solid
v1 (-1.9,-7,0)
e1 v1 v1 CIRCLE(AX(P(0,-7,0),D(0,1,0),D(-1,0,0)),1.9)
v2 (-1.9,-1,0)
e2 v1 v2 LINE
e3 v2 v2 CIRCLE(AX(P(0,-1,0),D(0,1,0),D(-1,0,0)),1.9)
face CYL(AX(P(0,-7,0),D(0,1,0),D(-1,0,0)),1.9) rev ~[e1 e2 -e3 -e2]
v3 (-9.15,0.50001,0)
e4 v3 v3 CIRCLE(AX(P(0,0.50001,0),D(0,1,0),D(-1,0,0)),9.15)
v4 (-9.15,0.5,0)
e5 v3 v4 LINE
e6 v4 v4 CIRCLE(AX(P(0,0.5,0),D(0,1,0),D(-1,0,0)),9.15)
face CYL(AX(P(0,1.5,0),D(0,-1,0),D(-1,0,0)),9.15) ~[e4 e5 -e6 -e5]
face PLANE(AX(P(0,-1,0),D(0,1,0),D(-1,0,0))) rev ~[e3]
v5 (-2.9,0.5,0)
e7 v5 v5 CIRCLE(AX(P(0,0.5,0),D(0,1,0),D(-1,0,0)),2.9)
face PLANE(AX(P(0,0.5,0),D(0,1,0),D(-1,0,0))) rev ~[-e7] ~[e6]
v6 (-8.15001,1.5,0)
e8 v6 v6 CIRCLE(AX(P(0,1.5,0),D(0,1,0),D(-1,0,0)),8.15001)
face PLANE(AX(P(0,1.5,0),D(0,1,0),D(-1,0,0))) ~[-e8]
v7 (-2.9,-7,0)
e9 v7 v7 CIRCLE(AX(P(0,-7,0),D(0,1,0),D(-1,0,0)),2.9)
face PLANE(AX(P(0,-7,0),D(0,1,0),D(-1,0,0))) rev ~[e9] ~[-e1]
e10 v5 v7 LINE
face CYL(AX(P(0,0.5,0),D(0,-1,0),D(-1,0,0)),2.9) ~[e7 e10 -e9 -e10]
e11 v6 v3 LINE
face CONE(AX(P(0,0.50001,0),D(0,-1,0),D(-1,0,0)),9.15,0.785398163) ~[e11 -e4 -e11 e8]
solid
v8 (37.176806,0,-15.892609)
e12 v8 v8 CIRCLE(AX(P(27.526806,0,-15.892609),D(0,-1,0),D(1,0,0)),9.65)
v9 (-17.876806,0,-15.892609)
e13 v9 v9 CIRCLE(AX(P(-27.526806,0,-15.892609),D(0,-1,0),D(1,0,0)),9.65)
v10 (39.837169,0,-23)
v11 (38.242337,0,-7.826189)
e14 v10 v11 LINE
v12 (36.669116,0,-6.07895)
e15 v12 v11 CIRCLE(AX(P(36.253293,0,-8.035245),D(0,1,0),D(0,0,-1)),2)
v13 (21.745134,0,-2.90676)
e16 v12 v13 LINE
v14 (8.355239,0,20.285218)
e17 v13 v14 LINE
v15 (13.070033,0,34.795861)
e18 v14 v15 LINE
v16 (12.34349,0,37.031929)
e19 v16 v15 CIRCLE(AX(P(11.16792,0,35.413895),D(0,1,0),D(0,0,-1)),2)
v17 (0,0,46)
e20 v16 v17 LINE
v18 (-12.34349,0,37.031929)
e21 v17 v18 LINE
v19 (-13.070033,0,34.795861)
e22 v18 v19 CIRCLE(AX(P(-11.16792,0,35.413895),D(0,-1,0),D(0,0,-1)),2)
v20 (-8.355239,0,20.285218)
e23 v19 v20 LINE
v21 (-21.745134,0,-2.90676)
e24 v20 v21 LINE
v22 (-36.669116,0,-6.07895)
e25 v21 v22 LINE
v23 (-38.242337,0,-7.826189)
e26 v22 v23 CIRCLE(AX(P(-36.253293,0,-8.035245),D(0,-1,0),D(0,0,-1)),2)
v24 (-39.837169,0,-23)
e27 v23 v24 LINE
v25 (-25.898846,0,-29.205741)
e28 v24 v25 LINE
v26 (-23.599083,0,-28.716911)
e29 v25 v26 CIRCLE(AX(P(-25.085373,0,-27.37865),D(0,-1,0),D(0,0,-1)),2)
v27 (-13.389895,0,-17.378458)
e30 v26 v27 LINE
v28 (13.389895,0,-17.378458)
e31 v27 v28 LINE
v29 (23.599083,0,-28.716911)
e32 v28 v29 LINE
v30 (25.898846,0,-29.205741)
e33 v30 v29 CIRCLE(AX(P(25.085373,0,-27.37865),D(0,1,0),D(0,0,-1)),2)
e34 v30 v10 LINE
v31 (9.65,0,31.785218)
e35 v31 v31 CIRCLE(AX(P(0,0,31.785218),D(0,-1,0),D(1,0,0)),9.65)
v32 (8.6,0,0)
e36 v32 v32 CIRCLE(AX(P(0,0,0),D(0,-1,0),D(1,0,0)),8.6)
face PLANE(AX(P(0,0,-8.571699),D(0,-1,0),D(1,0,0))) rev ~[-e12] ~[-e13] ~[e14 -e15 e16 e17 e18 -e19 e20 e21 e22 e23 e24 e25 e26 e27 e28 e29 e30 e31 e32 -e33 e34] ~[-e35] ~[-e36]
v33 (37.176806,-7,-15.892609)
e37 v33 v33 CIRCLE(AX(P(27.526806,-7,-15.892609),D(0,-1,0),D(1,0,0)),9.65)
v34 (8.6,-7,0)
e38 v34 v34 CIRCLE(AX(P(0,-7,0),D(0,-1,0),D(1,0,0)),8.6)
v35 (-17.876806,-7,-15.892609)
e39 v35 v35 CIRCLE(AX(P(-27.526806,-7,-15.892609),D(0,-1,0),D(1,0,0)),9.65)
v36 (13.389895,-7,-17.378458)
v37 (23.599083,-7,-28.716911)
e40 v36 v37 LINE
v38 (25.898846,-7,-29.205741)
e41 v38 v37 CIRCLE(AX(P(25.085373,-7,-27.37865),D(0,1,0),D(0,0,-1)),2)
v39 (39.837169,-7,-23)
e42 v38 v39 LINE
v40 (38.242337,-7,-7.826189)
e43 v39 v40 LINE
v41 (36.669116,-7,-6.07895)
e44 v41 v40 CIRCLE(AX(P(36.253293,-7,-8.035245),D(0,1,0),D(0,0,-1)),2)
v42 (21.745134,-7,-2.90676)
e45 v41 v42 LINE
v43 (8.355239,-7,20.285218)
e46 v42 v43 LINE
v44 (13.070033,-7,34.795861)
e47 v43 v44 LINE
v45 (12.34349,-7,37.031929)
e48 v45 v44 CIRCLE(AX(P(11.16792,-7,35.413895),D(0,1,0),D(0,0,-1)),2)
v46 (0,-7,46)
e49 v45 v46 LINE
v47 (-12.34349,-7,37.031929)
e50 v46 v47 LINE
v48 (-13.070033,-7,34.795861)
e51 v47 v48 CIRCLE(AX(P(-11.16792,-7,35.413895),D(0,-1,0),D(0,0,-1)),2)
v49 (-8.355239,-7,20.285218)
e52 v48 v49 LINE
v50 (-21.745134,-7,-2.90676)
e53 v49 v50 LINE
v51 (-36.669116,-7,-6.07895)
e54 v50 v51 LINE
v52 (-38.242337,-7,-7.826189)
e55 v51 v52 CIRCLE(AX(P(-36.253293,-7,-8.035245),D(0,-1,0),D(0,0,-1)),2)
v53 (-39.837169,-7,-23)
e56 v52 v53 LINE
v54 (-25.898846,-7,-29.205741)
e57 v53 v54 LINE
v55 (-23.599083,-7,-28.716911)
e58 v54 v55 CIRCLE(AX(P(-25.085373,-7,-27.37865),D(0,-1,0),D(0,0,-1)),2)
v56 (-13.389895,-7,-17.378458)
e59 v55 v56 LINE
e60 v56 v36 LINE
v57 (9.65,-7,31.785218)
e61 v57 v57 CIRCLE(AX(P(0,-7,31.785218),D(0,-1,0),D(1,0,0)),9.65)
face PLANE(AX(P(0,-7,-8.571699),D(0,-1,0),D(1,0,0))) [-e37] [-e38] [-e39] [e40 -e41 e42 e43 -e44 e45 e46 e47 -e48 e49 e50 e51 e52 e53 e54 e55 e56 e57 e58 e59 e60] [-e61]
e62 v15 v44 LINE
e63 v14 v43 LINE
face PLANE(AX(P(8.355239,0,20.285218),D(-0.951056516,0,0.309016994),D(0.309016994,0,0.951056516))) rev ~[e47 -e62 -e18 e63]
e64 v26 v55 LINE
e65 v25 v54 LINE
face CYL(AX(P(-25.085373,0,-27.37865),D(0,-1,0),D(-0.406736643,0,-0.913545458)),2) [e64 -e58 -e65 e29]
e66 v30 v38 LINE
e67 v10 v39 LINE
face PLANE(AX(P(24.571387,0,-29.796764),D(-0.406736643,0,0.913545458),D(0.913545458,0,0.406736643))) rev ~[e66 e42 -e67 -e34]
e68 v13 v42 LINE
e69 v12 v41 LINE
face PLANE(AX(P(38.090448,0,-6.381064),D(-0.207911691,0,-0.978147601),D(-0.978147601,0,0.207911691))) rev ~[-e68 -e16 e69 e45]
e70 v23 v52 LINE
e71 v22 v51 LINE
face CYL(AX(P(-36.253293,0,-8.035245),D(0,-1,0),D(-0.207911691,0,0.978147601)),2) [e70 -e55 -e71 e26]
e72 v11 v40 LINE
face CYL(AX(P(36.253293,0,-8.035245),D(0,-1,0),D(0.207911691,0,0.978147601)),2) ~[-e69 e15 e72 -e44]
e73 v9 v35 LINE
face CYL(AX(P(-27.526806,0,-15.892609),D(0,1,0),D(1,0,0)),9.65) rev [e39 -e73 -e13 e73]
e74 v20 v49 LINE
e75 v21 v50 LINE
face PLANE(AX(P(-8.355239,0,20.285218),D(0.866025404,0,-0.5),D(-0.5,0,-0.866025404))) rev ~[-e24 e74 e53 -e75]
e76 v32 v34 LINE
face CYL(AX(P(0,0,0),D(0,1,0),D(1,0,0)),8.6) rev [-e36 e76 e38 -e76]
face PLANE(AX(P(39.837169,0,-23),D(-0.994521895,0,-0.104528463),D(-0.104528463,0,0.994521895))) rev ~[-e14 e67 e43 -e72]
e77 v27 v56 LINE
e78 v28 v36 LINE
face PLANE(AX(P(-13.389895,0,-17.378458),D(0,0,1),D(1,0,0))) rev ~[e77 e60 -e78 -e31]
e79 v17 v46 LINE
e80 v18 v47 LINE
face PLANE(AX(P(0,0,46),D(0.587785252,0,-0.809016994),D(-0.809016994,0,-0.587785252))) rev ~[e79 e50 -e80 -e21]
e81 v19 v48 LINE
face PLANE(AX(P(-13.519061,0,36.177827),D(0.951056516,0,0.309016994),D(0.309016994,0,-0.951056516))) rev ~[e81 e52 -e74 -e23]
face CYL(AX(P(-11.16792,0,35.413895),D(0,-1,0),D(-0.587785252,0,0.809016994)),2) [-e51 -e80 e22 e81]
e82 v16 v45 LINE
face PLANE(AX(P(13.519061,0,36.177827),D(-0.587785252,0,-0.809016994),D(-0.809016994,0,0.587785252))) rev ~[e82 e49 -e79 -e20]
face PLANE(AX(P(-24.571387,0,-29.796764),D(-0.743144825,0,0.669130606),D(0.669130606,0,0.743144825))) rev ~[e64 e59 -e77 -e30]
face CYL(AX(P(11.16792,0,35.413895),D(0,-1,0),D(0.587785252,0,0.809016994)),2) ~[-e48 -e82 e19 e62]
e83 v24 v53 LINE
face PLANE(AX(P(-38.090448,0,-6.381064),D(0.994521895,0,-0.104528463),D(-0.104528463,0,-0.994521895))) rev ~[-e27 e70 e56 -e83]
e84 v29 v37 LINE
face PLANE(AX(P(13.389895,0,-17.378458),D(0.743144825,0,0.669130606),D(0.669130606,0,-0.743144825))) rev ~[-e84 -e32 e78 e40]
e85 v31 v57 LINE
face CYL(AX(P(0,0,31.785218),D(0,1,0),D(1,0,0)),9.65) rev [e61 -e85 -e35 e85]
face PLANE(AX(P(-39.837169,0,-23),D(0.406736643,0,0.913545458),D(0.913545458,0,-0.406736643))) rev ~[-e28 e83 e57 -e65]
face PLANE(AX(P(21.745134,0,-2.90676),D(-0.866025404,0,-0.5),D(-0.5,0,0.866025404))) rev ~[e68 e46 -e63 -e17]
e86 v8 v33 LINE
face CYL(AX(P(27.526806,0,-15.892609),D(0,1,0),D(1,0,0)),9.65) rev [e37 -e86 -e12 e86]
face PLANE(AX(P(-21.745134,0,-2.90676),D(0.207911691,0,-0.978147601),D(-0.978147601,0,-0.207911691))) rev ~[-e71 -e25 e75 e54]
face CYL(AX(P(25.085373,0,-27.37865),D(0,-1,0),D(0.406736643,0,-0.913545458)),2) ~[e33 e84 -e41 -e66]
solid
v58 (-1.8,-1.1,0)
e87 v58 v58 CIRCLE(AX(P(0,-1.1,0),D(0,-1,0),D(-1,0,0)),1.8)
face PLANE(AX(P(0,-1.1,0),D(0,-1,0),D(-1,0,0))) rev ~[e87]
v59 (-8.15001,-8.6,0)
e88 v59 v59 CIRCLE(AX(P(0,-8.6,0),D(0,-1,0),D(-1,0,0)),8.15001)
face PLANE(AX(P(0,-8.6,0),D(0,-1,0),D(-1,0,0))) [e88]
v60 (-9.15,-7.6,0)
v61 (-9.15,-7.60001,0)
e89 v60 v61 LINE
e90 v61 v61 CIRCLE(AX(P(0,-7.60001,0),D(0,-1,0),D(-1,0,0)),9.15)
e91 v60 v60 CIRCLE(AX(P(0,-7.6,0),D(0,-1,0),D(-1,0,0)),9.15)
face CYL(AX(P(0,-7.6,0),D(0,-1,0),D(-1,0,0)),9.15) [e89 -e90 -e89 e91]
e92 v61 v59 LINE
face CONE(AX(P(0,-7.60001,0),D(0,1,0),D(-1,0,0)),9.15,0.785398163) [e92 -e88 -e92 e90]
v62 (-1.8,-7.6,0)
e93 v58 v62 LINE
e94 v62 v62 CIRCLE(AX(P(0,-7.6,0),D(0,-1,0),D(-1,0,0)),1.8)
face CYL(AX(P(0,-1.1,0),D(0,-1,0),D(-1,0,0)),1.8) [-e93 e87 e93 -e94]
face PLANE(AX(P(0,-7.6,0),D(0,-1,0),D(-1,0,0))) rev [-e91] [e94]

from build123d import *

# Parameters (mm, degrees)
F0_R     = 9.65
F0_R_2   = 8.6
F1_DEPTH = 7
F2_R     = 2
F3_R     = 2
F6_SIZE  = 0.99999
F7_W     = 1.8
F7_H     = 5.9
F9_SIZE  = 0.99999


# Not quite as in the source:
# - a fillet or chamfer is up to 0.001 mm smaller than in the source, because OpenCascade refuses the exact size


with BuildPart() as f1:
    # F0 (on Front) → F1 (new body)
    with BuildSketch(Plane.XZ):
        Polygon((21.7451338694, -2.9067598383), (8.3552390721, 20.2852182588), (-8.3552390721, 20.2852182588), (-21.7451338694, -2.9067598383), (-38.0904479732, -6.3810636036), (-39.8371685741, -23), (-24.5713871705, -29.7967637845), (-13.3898947974, -17.3784584205), (13.3898947974, -17.3784584205), (24.5713871705, -29.7967637845), (39.8371685741, -23), (38.0904479732, -6.3810636036), align=None)
        with Locations((-27.5268064769, -15.8926091294)):
            Circle(F0_R, mode=Mode.SUBTRACT)
        with Locations((27.5268064769, -15.8926091294)):
            Circle(F0_R, mode=Mode.SUBTRACT)
        with BuildLine():
            Line((-13.9218488041, 8.0377831547), (-13.0164978485, 9.3043421992))
            ThreePointArc((-13.0164978485, 9.3043421992), (0, 16), (13.0164978485, 9.3043421992))
            Line((13.0164978485, 9.3043421992), (13.9218488041, 8.0377831547))
            Line((13.9218488041, 8.0377831547), (14.5660456343, 6.6204467055))
            ThreePointArc((14.5660456343, 6.6204467055), (15.6374027599, 3.3869802075), (16, 0))
            ThreePointArc((16, 0), (11.8488979355, -10.7519122817), (1.5495477858, -15.9247889047))
            Line((1.5495477858, -15.9247889047), (0, -16.0755663093))
            Line((0, -16.0755663093), (-1.5495477858, -15.9247889047))
            ThreePointArc((-1.5495477858, -15.9247889047), (-13.8564064606, -8), (-14.5660456343, 6.6204467055))
            Line((-14.5660456343, 6.6204467055), (-13.9218488041, 8.0377831547))
        make_face(mode=Mode.SUBTRACT)
        with BuildLine():
            ThreePointArc((13.0164978485, 9.3043421992), (0, 16), (-13.0164978485, 9.3043421992))
            ThreePointArc((-13.0164978485, 9.3043421992), (-13.8564064606, 8), (-14.5660456343, 6.6204467055))
            ThreePointArc((-14.5660456343, 6.6204467055), (-13.8564064606, -8), (-1.5495477858, -15.9247889047))
            ThreePointArc((-1.5495477858, -15.9247889047), (0, -16), (1.5495477858, -15.9247889047))
            ThreePointArc((1.5495477858, -15.9247889047), (11.8488979355, -10.7519122817), (16, 0))
            ThreePointArc((16, 0), (15.6374027599, 3.3869802075), (14.5660456343, 6.6204467055))
            ThreePointArc((14.5660456343, 6.6204467055), (13.8564064606, 8), (13.0164978485, 9.3043421992))
        make_face()
        Circle(F0_R_2, mode=Mode.SUBTRACT)
        Polygon((8.3552390721, 20.2852182588), (13.5190608027, 36.1778273881), (0, 46), (-13.5190608027, 36.1778273881), (-8.3552390721, 20.2852182588), align=None)
        with Locations((0, 31.7852182588)):
            Circle(F0_R, mode=Mode.SUBTRACT)
        with BuildLine():
            ThreePointArc((-14.5660456343, 6.6204467055), (-13.8564064606, 8), (-13.0164978485, 9.3043421992))
            Line((-13.0164978485, 9.3043421992), (-13.9218488041, 8.0377831547))
            Line((-13.9218488041, 8.0377831547), (-14.5660456343, 6.6204467055))
        make_face()
        with BuildLine():
            Line((13.9218488041, 8.0377831547), (13.0164978485, 9.3043421992))
            ThreePointArc((13.0164978485, 9.3043421992), (13.8564064606, 8), (14.5660456343, 6.6204467055))
            Line((14.5660456343, 6.6204467055), (13.9218488041, 8.0377831547))
        make_face()
        with BuildLine():
            ThreePointArc((1.5495477858, -15.9247889047), (0, -16), (-1.5495477858, -15.9247889047))
            Line((-1.5495477858, -15.9247889047), (0, -16.0755663093))
            Line((0, -16.0755663093), (1.5495477858, -15.9247889047))
        make_face()
    extrude(amount=F1_DEPTH)

    # F2
    f2_edges = [f1.edges().sort_by_distance(p)[0] for p in [
        (-13.519061, -3.5, 36.177827),
    ]]
    fillet(f2_edges, radius=F2_R)

    # F3
    f3_edges = [f1.edges().sort_by_distance(p)[0] for p in [
        (13.519061, -3.5, 36.177827),
        (38.090448, -3.5, -6.381064),
        (24.571387, -3.5, -29.796764),
        (-38.090448, -3.5, -6.381064),
        (-24.571387, -3.5, -29.796764),
    ]]
    fillet(f3_edges, radius=F3_R)


with BuildPart() as f5:
    # F4 (on Top) → F5 (revolve)
    with BuildSketch(Plane.XY):
        Polygon((-2.9, 0.5), (-2.9, 0), (-2.9, -7), (-1.9, -7), (-1.9, -1), (0, -1), (0, 1.5), (-9.15, 1.5), (-9.15, 0.5), align=None)
    revolve(axis=Axis((0, 0.25, 0), (0, 1, 0)))

    # F6 (size 1 in the source; OpenCascade refuses exactly that, so slightly less here)
    f6_edges = [f5.edges().sort_by_distance(p)[0] for p in [
        (9.15, 1.5, 0),
    ]]
    chamfer(f6_edges, length=F6_SIZE)


with BuildPart() as f8:
    # F7 (on Top) → F8 (revolve)
    with BuildSketch(Plane.XY):
        Polygon((0, -8.6), (0, -7), (-1.8, -7), (-1.8, -7.6), (-9.15, -7.6), (-9.15, -8.6), align=None)
        with Locations((-0.9, -4.05)):
            Rectangle(F7_W, F7_H)
    revolve(axis=Axis((0, -4.85, 0), (0, -1, 0)))

    # F9 (size 1 in the source; OpenCascade refuses exactly that, so slightly less here)
    f9_edges = [f8.edges().sort_by_distance(p)[0] for p in [
        (9.15, -8.6, 0),
    ]]
    chamfer(f9_edges, length=F9_SIZE)


solid = Compound([f1.part, f5.part, f8.part])
